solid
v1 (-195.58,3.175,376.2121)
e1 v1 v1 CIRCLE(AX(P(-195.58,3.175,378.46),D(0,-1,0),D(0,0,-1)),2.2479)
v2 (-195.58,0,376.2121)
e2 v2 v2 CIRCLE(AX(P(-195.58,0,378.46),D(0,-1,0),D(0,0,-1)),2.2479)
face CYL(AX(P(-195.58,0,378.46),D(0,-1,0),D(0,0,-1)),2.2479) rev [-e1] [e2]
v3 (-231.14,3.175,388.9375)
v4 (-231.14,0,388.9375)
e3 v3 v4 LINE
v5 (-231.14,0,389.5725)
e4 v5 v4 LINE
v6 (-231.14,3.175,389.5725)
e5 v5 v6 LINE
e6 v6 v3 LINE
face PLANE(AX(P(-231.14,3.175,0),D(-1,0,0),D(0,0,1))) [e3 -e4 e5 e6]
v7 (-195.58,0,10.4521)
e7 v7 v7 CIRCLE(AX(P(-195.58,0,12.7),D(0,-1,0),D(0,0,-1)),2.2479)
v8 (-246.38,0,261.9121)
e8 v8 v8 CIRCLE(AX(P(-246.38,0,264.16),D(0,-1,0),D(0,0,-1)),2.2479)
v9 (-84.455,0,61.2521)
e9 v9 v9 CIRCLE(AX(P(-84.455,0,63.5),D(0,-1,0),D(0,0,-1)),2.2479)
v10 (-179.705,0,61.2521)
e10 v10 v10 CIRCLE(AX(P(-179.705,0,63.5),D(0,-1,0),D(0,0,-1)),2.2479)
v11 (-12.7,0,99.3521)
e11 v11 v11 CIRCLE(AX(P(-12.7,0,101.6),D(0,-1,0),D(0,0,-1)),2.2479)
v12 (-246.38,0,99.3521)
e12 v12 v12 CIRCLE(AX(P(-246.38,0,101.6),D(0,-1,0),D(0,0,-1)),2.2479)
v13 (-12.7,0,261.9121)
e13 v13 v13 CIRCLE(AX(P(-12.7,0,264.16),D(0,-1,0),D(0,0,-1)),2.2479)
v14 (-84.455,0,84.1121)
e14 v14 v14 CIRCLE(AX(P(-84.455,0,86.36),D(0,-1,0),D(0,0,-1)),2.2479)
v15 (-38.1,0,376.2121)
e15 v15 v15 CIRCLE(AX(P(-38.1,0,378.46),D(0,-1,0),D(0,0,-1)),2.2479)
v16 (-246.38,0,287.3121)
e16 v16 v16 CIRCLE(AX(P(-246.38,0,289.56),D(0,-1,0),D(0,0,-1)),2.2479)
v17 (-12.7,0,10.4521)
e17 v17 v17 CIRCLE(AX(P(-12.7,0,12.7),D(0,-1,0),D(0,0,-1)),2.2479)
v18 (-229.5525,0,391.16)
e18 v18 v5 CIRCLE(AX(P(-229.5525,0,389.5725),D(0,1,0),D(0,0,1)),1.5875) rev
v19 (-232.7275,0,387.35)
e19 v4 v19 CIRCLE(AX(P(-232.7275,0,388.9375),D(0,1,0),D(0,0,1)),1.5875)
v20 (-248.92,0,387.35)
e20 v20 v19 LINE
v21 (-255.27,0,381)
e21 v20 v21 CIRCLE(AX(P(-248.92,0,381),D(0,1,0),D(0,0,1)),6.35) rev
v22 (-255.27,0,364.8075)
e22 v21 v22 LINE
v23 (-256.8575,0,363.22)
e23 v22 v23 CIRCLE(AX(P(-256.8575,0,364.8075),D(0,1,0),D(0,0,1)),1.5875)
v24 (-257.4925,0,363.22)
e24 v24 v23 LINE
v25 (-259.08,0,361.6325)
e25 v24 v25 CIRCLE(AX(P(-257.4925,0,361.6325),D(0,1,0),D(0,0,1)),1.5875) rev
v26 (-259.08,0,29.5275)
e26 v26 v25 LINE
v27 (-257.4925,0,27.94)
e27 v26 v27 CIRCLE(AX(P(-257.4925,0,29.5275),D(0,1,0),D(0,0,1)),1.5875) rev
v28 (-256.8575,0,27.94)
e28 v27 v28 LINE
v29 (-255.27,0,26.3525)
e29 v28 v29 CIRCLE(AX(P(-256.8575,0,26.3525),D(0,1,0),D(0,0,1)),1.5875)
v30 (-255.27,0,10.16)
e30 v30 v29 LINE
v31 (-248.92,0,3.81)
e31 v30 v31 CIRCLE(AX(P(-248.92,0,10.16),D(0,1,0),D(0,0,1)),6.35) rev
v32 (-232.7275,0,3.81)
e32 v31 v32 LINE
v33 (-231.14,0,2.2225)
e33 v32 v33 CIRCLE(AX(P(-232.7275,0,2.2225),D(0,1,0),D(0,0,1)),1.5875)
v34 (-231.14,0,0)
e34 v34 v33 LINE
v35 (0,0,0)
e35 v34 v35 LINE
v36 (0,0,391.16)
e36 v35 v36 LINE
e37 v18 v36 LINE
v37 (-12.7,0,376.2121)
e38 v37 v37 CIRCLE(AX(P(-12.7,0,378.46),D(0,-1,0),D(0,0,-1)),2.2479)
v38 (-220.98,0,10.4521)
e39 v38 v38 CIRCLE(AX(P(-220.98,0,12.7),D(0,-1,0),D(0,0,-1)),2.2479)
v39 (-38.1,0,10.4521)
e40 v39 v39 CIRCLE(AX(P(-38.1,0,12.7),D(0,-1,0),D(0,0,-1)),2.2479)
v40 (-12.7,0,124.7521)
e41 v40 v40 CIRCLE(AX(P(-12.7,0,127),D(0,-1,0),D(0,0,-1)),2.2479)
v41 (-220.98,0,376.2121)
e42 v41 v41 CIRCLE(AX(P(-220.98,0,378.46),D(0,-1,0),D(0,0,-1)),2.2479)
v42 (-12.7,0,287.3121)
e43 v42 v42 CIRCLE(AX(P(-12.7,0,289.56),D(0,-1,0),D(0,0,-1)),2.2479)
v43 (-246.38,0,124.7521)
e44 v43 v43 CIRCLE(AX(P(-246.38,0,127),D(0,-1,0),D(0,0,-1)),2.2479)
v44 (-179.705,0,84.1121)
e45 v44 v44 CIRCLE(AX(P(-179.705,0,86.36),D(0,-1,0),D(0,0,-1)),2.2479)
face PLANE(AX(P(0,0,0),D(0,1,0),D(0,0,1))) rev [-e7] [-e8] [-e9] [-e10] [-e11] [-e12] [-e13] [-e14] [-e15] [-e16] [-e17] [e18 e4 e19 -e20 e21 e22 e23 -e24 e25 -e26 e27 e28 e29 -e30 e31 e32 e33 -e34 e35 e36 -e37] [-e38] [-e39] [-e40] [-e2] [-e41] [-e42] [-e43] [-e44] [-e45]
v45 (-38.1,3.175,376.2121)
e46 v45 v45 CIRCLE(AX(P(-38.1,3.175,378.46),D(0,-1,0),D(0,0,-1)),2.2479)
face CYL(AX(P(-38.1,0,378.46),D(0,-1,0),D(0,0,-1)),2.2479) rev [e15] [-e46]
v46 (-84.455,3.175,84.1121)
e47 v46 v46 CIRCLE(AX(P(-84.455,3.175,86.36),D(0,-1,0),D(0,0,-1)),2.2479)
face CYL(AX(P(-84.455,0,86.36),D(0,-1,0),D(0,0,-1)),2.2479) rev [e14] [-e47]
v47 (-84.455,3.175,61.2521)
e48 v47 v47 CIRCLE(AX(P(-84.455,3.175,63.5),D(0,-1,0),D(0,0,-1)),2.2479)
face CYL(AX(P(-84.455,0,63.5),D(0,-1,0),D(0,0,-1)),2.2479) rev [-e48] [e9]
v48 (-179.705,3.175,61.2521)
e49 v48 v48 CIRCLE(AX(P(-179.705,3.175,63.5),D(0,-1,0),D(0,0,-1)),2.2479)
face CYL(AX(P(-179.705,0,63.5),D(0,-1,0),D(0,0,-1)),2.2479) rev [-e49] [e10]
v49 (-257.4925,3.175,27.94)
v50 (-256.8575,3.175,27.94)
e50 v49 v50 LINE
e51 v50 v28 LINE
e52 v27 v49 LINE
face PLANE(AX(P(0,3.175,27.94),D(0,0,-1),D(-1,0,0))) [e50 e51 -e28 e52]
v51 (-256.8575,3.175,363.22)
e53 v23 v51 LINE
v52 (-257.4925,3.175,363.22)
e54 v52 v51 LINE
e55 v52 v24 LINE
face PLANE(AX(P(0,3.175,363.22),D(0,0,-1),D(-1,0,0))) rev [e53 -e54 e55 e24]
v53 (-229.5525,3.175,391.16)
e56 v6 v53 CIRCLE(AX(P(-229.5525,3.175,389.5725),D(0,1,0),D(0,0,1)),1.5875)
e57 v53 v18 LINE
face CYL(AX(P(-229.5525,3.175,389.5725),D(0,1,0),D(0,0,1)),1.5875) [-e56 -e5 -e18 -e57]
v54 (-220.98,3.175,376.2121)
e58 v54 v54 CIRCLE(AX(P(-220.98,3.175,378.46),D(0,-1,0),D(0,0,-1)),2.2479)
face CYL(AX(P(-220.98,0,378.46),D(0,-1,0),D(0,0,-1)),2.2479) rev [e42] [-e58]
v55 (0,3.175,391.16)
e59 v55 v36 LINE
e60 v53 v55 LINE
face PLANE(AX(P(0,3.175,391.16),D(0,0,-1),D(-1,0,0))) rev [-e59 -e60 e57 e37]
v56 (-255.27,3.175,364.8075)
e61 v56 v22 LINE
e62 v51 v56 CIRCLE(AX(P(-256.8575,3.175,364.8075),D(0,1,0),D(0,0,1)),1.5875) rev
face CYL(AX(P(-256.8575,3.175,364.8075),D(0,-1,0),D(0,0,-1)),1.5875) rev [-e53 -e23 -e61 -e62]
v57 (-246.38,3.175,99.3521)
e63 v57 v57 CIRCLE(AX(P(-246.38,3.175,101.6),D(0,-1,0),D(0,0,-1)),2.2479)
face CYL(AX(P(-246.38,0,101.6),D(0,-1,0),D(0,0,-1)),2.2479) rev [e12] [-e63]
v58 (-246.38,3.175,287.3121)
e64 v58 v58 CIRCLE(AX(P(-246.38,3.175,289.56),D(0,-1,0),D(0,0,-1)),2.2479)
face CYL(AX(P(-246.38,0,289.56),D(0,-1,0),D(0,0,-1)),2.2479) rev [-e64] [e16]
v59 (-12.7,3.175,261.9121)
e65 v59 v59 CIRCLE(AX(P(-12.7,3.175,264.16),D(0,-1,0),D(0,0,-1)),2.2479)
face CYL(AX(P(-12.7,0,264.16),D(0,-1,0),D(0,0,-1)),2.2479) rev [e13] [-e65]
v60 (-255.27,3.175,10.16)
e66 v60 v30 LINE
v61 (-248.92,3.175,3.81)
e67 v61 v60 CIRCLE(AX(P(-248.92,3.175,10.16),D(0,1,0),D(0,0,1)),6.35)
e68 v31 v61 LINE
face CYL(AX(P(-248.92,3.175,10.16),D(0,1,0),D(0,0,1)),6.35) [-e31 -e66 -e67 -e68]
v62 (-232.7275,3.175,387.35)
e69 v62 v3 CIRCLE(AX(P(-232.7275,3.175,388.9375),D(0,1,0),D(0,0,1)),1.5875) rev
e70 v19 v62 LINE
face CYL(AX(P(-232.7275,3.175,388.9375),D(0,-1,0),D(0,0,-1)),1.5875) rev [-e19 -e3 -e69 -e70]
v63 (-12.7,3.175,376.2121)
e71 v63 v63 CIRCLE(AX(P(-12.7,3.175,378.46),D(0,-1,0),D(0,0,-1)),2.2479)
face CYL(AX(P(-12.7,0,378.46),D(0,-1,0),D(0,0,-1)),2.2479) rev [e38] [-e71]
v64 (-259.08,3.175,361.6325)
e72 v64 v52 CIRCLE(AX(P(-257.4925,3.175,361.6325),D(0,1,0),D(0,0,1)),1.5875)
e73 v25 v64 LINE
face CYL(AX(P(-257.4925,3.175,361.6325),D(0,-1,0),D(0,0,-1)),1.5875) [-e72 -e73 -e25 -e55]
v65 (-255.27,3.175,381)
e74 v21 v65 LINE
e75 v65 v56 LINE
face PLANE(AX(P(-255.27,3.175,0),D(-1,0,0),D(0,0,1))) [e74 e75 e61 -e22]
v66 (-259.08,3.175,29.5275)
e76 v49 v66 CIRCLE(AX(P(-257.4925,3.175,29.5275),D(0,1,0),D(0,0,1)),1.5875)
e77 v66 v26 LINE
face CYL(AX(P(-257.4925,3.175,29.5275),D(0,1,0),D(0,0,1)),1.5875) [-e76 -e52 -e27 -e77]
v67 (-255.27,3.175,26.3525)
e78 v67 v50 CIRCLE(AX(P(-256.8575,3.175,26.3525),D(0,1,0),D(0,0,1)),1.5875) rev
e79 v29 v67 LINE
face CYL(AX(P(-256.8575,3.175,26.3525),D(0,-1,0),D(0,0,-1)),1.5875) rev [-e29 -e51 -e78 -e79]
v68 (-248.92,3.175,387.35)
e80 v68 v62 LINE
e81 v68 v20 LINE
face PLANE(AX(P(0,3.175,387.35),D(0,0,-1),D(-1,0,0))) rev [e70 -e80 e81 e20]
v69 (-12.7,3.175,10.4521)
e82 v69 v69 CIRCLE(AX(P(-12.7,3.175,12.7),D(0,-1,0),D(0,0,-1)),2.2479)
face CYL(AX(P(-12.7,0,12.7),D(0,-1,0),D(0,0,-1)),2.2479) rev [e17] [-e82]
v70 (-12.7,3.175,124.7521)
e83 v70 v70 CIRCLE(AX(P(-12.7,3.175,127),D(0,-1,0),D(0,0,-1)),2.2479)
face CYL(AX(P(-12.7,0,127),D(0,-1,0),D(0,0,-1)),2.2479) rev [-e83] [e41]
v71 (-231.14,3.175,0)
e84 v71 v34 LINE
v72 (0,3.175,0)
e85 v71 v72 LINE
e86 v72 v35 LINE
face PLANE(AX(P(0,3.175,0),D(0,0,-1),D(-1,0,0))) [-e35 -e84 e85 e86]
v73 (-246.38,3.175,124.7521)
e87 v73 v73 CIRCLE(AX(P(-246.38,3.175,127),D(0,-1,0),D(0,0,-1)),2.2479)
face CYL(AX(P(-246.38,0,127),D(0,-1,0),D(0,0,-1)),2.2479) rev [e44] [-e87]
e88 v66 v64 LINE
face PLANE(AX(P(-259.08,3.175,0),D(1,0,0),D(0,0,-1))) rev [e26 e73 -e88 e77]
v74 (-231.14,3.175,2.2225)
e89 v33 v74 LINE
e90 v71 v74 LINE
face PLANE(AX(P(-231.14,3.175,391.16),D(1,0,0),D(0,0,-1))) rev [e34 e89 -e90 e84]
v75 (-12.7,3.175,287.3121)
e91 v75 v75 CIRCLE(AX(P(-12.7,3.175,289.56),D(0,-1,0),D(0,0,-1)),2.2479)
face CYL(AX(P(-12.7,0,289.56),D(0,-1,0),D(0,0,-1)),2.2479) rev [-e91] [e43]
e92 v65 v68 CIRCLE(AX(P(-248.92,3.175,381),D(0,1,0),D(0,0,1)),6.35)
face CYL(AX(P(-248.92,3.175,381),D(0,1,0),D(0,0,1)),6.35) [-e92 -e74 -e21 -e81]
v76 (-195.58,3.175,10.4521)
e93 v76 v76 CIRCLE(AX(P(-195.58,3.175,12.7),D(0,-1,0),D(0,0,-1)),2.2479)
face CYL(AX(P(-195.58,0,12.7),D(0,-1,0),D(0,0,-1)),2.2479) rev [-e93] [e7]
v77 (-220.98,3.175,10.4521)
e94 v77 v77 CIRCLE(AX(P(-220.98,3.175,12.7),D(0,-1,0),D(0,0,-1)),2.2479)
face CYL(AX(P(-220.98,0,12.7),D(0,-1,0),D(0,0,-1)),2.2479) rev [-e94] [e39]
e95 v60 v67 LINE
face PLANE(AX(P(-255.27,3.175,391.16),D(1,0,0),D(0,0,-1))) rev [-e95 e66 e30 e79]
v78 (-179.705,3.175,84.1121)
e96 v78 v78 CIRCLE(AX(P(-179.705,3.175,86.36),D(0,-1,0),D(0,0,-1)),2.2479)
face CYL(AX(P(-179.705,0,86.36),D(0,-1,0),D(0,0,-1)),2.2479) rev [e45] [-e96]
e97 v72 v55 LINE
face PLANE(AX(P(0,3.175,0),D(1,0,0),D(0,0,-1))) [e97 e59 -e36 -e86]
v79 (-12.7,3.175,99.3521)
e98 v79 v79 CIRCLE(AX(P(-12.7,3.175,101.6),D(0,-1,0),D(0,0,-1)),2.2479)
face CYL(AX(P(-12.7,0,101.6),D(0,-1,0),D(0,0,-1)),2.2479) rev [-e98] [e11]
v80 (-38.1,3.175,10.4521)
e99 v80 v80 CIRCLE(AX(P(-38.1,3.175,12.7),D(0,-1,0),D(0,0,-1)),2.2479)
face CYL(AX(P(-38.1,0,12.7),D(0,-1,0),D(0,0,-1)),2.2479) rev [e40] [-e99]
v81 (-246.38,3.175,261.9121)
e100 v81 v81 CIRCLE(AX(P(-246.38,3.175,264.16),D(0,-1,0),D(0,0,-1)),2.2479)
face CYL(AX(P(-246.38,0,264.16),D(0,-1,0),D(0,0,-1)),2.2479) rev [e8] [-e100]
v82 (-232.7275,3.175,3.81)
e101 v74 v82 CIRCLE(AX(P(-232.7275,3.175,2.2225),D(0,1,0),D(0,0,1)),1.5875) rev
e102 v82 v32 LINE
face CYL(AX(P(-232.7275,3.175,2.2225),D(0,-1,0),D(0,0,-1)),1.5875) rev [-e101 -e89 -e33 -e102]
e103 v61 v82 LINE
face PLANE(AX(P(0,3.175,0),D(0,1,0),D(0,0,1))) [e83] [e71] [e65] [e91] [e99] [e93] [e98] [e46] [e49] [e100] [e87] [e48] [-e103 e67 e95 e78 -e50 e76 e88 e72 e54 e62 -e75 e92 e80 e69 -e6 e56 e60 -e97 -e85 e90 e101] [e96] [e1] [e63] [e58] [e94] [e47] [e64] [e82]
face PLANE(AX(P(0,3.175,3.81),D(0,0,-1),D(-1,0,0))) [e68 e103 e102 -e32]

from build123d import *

# Parameters (mm, degrees)
SKETCH1_W             = 259.08
SKETCH1_H             = 391.16
BOSS_EXTRUDE1_DEPTH   = 3.175
F_8_CLEARANCE_HOLE1_D = 4.4958
F_8_CLEARANCE_HOLE2_D = 4.4958
SKETCH25_W            = 3.81
SKETCH25_H            = 24.13
SKETCH25_H_2          = 3.81
SKETCH25_W_2          = 24.13
CUT_EXTRUDE1_DEPTH    = 470.18937821
FILLET2_R             = 1.5875
FILLET3_R             = 6.35
MIRROR1_DEPTH         = 3.175


# Read off the part's stored shape, not the designer's step: Mirror1
with BuildPart() as part:
    # Sketch1 → Boss-Extrude1 (new body)
    with BuildSketch(Plane(origin=(0, 0, 0), x_dir=(1, 0, 0), z_dir=(0, 1, 0))):
        with Locations((-129.54, -195.58)):
            Rectangle(SKETCH1_W, SKETCH1_H)
    extrude(amount=BOSS_EXTRUDE1_DEPTH)

    # #8 Clearance Hole1 (through all)
    with Locations(Plane(origin=(0, 0, 0), x_dir=(-1, 0, 0), z_dir=(0, -1, 0))):
        with Locations((84.455, -63.5), (84.455, -86.36), (179.705, -86.36), (179.705, -63.5)):
            Hole(F_8_CLEARANCE_HOLE1_D / 2)

    # #8 Clearance Hole2 (through all)
    with Locations(Plane(origin=(0, 0, 0), x_dir=(-1, 0, 0), z_dir=(0, -1, 0))):
        with Locations((12.7, -101.6), (220.98, -12.7), (246.38, -101.6), (246.38, -289.56), (195.58, -12.7), (12.7, -289.56), (246.38, -264.16), (246.38, -127), (12.7, -127), (12.7, -264.16), (12.7, -378.46), (220.98, -378.46), (38.1, -12.7), (12.7, -12.7), (38.1, -378.46), (195.58, -378.46)):
            Hole(F_8_CLEARANCE_HOLE2_D / 2)

    # Sketch25 → Cut-Extrude1 (cut, through all)
    with BuildSketch(Plane.XZ):
        with Locations((-257.175, 375.285)):
            Rectangle(SKETCH25_W, SKETCH25_H)
        with Locations((-257.175, 389.255)):
            Rectangle(SKETCH25_W, SKETCH25_H_2)
        with Locations((-243.205, 389.255)):
            Rectangle(SKETCH25_W_2, SKETCH25_H_2)
    extrude(amount=-CUT_EXTRUDE1_DEPTH, mode=Mode.SUBTRACT)

    # Fillet2
    fillet2_edges = [part.edges().sort_by_distance(p)[0] for p in [
        (-255.27, 1.5875, 363.22),
        (-259.08, 1.5875, 363.22),
        (-231.14, 1.5875, 391.16),
        (-231.14, 1.5875, 387.35),
    ]]
    fillet(fillet2_edges, radius=FILLET2_R)

    # Fillet3
    fillet3_edges = [part.edges().sort_by_distance(p)[0] for p in [
        (-255.27, 1.5875, 387.35),
    ]]
    fillet(fillet3_edges, radius=FILLET3_R)

    # Mirror1 outline → Mirror1 (cut)
    with BuildSketch(Plane(origin=(0, 0, 0), x_dir=(1, 0, 0), z_dir=(0, 1, 0))):
        with BuildLine():
            ThreePointArc((-256.8575, -27.94), (-255.734967985, -27.475032015), (-255.27, -26.3525))
            Line((-255.27, -26.3525), (-255.27, -10.16))
            ThreePointArc((-255.27, -10.16), (-253.410128061, -5.669871939), (-248.92, -3.81))
            Line((-248.92, -3.81), (-232.7275, -3.81))
            ThreePointArc((-232.7275, -3.81), (-231.604967985, -3.345032015), (-231.14, -2.2225))
            Line((-231.14, -2.2225), (-231.14, 0))
            Line((-231.14, 0), (-259.08, 0))
            Line((-259.08, 0), (-259.08, -29.5275))
            ThreePointArc((-259.08, -29.5275), (-258.615032015, -28.404967985), (-257.4925, -27.94))
            Line((-257.4925, -27.94), (-256.8575, -27.94))
        make_face()
    extrude(amount=MIRROR1_DEPTH, mode=Mode.SUBTRACT)


solid = part.part
